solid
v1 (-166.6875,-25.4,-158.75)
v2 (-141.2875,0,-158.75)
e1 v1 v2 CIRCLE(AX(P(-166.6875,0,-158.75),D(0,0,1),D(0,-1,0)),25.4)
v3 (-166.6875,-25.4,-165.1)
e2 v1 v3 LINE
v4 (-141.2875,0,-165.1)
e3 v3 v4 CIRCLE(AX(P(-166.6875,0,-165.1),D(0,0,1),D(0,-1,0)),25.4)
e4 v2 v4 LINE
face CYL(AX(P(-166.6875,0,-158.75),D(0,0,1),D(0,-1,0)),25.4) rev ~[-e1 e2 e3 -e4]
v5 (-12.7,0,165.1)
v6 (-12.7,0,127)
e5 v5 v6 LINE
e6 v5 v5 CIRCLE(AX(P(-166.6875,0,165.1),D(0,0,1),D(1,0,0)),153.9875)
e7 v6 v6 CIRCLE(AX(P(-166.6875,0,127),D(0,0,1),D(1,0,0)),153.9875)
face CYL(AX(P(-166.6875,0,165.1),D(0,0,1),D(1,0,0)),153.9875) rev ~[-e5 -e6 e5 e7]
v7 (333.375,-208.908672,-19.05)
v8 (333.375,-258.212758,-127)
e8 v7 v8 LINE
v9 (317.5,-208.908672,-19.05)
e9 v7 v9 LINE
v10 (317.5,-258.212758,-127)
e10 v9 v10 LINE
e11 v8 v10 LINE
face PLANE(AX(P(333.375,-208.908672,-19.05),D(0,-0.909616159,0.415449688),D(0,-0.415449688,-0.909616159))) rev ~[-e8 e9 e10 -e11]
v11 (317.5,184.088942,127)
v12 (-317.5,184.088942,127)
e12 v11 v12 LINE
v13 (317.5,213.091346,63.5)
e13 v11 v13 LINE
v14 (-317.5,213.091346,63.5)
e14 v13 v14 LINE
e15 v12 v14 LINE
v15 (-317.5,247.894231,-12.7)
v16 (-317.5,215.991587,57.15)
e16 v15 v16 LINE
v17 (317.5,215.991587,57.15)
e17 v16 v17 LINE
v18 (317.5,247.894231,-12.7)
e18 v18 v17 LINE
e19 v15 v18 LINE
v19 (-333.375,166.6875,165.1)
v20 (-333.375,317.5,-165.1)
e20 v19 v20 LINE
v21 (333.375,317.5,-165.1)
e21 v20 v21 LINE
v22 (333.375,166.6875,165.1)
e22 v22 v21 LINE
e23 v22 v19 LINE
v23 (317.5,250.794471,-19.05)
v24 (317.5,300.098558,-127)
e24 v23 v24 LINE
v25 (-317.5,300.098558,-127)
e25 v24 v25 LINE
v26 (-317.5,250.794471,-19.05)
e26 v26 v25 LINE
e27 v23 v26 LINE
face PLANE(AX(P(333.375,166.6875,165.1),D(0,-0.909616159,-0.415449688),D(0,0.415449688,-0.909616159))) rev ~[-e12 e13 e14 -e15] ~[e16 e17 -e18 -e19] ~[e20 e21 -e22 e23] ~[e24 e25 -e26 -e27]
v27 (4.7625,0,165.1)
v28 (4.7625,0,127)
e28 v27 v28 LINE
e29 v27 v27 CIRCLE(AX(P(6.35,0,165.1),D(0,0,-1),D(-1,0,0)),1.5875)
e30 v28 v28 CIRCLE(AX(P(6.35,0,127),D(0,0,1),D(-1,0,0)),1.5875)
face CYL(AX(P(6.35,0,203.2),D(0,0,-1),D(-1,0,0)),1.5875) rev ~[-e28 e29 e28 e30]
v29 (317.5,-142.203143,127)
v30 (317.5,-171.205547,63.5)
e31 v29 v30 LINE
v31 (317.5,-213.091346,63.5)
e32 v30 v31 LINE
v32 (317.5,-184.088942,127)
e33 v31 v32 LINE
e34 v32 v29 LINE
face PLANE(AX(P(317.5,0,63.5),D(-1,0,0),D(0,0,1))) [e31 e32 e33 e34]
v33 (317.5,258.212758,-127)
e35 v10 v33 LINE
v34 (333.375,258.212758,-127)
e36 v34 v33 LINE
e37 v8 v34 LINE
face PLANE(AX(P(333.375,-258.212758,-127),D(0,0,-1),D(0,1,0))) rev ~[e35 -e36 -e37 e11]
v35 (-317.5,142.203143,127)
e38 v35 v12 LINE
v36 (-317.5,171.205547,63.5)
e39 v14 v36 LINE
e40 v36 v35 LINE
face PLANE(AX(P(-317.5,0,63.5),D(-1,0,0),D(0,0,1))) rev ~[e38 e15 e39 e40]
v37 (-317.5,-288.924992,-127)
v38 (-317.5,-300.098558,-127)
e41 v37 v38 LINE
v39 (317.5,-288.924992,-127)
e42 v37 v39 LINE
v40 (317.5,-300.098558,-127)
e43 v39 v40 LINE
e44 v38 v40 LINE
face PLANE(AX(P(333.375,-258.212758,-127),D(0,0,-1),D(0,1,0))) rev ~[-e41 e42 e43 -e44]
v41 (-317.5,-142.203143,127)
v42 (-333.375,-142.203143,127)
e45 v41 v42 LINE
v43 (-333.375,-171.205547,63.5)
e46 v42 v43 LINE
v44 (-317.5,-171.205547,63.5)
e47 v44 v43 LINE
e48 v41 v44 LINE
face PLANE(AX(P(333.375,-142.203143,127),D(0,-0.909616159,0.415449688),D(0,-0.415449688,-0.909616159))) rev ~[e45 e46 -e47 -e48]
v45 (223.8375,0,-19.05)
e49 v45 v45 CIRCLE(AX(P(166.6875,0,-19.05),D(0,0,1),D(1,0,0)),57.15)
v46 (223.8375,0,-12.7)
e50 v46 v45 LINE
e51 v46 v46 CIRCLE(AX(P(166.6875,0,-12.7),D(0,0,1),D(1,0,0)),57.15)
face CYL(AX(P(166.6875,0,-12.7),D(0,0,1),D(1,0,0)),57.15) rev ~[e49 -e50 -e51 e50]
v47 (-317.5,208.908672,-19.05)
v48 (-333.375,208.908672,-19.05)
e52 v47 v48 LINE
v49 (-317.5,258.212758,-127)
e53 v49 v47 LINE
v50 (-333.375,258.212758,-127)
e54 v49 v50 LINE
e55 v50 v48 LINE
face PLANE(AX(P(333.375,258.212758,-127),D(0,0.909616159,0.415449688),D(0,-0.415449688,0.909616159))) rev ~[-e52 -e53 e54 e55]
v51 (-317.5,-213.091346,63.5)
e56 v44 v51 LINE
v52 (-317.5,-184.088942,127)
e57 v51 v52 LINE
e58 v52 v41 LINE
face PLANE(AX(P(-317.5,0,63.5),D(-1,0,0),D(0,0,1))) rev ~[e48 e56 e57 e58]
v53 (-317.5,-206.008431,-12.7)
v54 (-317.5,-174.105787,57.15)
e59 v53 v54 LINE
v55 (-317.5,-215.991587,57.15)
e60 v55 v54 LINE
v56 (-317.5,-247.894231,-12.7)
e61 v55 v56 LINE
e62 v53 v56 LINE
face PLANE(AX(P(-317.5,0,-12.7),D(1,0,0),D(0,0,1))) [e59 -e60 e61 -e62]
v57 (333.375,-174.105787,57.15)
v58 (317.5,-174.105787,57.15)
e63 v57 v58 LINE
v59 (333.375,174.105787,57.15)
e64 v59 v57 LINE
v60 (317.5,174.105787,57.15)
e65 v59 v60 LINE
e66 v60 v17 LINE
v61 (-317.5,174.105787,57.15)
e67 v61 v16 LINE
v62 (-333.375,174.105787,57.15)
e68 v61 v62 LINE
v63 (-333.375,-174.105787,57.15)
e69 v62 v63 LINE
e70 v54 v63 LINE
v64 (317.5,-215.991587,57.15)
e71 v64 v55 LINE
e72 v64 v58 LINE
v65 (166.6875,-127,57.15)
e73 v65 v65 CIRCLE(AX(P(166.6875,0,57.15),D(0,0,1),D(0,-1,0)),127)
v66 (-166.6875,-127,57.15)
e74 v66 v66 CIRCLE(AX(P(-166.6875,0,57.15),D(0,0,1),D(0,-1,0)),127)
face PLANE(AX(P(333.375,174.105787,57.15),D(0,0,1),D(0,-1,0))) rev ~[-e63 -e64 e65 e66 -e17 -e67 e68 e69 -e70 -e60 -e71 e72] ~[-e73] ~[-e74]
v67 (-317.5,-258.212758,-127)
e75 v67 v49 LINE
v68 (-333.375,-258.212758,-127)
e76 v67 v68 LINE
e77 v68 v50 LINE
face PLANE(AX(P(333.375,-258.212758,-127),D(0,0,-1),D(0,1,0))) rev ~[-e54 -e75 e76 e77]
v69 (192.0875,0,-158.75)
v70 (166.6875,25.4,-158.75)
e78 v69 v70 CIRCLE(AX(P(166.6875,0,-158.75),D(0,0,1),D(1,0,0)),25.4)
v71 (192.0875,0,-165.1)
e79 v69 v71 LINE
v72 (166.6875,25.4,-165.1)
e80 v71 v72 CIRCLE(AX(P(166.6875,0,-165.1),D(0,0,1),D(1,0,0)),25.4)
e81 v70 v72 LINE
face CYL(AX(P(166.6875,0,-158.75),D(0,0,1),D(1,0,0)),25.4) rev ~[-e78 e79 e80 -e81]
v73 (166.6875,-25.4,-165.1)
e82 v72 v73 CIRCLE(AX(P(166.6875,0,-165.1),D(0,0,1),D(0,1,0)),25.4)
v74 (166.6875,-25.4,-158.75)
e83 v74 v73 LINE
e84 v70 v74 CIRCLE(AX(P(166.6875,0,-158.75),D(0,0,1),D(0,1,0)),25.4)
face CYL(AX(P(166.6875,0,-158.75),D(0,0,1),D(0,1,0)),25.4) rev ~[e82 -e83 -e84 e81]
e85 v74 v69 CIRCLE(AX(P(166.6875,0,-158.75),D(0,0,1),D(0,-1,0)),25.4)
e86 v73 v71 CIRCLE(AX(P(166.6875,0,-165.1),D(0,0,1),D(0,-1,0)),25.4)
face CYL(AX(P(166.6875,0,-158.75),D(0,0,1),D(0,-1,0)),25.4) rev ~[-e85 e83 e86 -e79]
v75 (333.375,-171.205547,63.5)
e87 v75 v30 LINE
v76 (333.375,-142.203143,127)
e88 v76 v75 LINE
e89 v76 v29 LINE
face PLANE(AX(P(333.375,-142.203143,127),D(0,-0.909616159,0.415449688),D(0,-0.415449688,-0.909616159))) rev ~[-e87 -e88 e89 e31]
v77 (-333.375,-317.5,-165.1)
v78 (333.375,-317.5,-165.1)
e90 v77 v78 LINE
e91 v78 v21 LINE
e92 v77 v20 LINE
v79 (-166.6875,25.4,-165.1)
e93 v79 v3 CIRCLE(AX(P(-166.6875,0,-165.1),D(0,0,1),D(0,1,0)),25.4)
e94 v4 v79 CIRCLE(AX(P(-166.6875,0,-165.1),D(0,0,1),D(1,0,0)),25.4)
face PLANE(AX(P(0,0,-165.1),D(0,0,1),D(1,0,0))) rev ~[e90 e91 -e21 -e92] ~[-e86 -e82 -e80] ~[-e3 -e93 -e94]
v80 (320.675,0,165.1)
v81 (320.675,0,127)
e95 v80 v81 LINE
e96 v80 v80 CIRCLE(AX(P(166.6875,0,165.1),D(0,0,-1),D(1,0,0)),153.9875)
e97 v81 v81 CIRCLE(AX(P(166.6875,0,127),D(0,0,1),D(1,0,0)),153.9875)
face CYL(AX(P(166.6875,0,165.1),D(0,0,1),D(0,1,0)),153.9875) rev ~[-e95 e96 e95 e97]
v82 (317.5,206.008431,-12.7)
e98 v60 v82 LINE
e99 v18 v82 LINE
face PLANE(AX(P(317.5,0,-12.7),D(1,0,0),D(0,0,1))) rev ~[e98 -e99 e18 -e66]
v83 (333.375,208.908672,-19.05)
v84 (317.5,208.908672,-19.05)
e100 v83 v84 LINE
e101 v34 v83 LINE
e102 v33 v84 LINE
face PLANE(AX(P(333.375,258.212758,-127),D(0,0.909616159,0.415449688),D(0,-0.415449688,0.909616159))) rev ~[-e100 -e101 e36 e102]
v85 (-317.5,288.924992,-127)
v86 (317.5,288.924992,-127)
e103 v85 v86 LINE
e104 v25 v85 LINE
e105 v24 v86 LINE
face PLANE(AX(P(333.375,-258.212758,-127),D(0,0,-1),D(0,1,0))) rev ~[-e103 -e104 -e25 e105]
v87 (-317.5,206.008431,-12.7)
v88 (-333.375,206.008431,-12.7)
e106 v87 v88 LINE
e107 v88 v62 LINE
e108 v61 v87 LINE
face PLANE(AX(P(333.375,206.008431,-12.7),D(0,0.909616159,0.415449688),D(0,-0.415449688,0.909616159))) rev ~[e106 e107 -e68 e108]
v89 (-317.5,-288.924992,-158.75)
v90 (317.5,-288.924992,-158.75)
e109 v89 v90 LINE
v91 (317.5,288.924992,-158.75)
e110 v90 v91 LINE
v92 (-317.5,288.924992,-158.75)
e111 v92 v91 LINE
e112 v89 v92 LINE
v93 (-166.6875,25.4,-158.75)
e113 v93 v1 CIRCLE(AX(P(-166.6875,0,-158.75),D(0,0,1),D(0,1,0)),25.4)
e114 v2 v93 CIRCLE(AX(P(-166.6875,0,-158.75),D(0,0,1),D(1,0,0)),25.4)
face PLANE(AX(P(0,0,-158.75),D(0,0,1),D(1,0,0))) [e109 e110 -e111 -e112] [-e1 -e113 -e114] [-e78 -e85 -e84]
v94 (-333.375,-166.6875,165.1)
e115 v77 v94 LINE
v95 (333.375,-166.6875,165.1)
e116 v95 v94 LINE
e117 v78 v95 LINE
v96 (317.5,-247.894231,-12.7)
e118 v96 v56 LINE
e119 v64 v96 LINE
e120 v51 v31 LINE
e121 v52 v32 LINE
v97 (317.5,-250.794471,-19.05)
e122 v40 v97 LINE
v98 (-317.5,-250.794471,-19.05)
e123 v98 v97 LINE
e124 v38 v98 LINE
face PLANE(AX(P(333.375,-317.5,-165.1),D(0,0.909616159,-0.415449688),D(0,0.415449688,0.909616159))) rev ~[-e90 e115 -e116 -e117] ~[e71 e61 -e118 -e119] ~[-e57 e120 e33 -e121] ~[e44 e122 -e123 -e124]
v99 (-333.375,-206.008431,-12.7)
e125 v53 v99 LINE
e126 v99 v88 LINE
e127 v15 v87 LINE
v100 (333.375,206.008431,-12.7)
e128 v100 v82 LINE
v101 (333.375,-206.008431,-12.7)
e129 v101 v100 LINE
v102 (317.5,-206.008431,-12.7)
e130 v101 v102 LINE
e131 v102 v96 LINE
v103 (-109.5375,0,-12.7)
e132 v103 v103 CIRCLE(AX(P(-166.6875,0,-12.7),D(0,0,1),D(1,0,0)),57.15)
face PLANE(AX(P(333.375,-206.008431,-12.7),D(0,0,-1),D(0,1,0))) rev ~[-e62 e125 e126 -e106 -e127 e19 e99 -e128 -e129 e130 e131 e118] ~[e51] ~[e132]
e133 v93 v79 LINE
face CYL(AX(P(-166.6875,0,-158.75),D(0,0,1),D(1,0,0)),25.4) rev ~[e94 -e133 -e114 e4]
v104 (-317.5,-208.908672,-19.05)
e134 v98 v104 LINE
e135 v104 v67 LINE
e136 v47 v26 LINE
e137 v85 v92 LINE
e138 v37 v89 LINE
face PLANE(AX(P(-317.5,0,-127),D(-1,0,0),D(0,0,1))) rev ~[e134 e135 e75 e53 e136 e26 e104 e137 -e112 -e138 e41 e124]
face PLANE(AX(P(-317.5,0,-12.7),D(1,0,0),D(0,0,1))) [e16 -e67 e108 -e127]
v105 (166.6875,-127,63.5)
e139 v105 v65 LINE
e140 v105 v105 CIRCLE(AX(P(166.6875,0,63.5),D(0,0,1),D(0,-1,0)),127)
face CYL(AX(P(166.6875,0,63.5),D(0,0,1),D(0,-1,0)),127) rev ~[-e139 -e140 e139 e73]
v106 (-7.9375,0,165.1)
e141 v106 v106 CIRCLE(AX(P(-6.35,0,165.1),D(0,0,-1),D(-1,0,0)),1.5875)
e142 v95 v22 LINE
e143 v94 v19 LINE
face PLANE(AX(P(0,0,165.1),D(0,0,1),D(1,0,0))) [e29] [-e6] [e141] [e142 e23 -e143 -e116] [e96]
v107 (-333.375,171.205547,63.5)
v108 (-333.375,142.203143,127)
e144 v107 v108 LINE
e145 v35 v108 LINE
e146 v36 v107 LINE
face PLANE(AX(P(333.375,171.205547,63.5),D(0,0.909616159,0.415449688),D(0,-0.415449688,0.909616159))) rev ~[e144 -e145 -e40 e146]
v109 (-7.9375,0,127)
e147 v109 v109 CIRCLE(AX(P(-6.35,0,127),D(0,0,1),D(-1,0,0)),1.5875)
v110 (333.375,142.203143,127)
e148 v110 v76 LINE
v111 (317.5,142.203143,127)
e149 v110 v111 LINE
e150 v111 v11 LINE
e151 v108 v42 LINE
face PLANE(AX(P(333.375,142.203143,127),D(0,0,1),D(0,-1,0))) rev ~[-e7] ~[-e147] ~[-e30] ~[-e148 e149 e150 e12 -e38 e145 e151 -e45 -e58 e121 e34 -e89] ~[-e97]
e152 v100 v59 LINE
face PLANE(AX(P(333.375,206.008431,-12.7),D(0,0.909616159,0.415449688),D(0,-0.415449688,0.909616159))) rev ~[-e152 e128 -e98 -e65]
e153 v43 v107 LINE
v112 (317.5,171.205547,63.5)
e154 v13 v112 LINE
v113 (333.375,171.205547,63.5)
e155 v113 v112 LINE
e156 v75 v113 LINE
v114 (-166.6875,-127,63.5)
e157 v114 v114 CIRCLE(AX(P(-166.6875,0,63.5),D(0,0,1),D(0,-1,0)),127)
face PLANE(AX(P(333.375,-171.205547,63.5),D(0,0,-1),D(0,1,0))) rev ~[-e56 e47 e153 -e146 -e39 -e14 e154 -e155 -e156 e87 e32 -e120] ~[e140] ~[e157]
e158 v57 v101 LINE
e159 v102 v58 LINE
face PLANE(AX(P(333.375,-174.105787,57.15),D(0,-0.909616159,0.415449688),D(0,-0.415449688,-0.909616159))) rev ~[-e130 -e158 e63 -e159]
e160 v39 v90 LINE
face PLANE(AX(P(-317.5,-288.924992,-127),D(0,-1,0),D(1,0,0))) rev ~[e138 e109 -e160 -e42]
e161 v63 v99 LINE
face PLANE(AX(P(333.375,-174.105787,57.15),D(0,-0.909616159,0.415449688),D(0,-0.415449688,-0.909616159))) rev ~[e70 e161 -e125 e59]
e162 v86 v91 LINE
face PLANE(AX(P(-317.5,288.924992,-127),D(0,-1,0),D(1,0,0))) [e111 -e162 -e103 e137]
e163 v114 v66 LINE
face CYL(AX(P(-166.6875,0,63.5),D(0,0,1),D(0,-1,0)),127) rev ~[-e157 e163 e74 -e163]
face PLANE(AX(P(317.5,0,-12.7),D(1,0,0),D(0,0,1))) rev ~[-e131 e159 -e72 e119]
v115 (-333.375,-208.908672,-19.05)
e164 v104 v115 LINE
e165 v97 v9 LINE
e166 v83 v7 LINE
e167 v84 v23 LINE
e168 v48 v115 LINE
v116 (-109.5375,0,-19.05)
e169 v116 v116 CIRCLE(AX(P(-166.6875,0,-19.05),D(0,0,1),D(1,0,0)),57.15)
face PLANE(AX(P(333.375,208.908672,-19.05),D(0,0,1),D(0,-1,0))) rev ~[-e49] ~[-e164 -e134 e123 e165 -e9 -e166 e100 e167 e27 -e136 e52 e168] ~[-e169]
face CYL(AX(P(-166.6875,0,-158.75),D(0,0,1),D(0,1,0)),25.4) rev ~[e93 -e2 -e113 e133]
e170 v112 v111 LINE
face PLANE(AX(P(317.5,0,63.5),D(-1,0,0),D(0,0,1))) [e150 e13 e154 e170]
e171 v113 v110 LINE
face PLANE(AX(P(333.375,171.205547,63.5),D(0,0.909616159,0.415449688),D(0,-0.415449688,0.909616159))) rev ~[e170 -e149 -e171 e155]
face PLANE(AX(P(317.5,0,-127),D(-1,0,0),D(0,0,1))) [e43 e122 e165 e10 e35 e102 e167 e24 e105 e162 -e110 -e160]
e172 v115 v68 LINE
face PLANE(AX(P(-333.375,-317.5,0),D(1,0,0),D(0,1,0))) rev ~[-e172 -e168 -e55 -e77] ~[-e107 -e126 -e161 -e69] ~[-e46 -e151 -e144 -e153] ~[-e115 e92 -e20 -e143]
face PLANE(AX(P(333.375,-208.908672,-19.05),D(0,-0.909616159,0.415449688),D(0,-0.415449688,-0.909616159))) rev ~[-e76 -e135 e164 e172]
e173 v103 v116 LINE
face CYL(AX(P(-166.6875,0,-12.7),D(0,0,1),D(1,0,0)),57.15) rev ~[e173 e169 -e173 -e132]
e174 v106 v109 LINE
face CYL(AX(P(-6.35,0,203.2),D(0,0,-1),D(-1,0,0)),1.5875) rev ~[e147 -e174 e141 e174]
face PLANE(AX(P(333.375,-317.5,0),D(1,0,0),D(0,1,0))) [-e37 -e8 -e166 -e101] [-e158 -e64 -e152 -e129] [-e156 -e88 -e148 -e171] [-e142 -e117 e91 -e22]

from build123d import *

# Parameters (mm, degrees)
F0_W      = 666.75
F0_H      = 635
F1_DEPTH  = 165.1
F4_W      = 333.375
F4_H      = 69.85
F5_DEPTH  = 666.751
F6_W      = 635
F6_H      = 63.5
F6_H_2    = 107.95
F6_H_3    = 69.85
F7_DEPTH  = 330.2
F9_DEPTH  = 38.1
F11_DEPTH = 25.4
F13_DEPTH = 25.4
F14_W     = 635
F14_H     = 577.849984169
F15_DEPTH = 31.75
F17_DEPTH = 25.4
F19_D     = 3.175
F19_DEPTH = 38.1
F19_TIP   = 0.9538662327


with BuildPart() as f1:
    # F0 (on Top) → F1 (new body, symmetric)
    with BuildSketch(Plane.XY):
        Rectangle(F0_W, F0_H)
    extrude(amount=F1_DEPTH, both=True)

    # F4 (on face) → F5 (cut, through all)
    with BuildSketch(Plane.YZ.offset(333.375)):
        Polygon((0, 127), (-142.2031428718, 127), (-166.6875, 73.3921443929), (-166.6875, 63.5), (166.6875, 63.5), (166.6875, 73.3921443929), (142.2031428718, 127), align=None)
        Polygon((-166.6875, 63.5), (-166.6875, 73.3921443929), (-171.2055467179, 63.5), align=None)
        Polygon((171.2055467179, 63.5), (166.6875, 73.3921443929), (166.6875, 63.5), align=None)
        Polygon((174.1057871025, 57.15), (166.6875, 57.15), (166.6875, -12.7), (206.0084313333, -12.7), align=None)
        with Locations((0, 22.225)):
            Rectangle(F4_W, F4_H)
        Polygon((-166.6875, -12.7), (-166.6875, 57.15), (-174.1057871025, 57.15), (-206.0084313333, -12.7), align=None)
        Polygon((-208.9086717179, -19.05), (-258.2127582564, -127), (-166.6875, -127), (-166.6875, -19.05), align=None)
        Polygon((-166.6875, -19.05), (-166.6875, -127), (0, -127), (166.6875, -127), (166.6875, -19.05), align=None)
        Polygon((166.6875, -19.05), (166.6875, -127), (258.2127582564, -127), (208.9086717179, -19.05), align=None)
        Polygon((317.5, 165.1), (166.6875, 165.1), (184.0889423077, 127), (213.0913461538, 63.5), (317.5, -165.1), align=None)
        Polygon((-184.0889423077, 127), (-166.6875, 165.1), (-317.5, 165.1), (-317.5, -165.1), (-213.0913461538, 63.5), align=None)
    extrude(amount=-F5_DEPTH, mode=Mode.SUBTRACT)

    # F6 (on Front) → F7 (cut, symmetric)
    with BuildSketch(Plane.XZ):
        with Locations((0, 95.25)):
            Rectangle(F6_W, F6_H)
        with Locations((0, -73.025)):
            Rectangle(F6_W, F6_H_2)
        with Locations((0, 22.225)):
            Rectangle(F6_W, F6_H_3)
    extrude(amount=F7_DEPTH, both=True, mode=Mode.SUBTRACT)

    # F3 (on face) + F8 (on face) → F9 (cut)
    with BuildSketch(Plane.XY.offset(165.1)):
        with BuildLine():
            ThreePointArc((-166.6875, 153.9875), (-320.675, 0), (-166.6875, -153.9875))
            Line((-166.6875, -153.9875), (-166.6875, 153.9875))
        make_face()
        with BuildLine():
            Line((-166.6875, 153.9875), (-166.6875, -153.9875))
            ThreePointArc((-166.6875, -153.9875), (-57.801894532, -108.885605468), (-12.7, 0))
            ThreePointArc((-12.7, 0), (-57.801894532, 108.885605468), (-166.6875, 153.9875))
        make_face()
        with BuildLine():
            ThreePointArc((166.6875, 153.9875), (12.7, 0), (166.6875, -153.9875))
            Line((166.6875, -153.9875), (166.6875, 153.9875))
        make_face()
    with BuildSketch(Plane.XY.offset(165.1)):
        with BuildLine():
            Line((166.6875, 153.9875), (166.6875, -153.9875))
            ThreePointArc((166.6875, -153.9875), (275.573105468, -108.885605468), (320.675, 0))
            ThreePointArc((320.675, 0), (275.573105468, 108.885605468), (166.6875, 153.9875))
        make_face()
    extrude(amount=-F9_DEPTH, mode=Mode.SUBTRACT)

    # F10 (on face) → F11 (cut)
    with BuildSketch(Plane.XY.offset(63.5)):
        with BuildLine():
            ThreePointArc((-166.6875, 127), (-293.6875, 0), (-166.6875, -127))
            Line((-166.6875, -127), (-166.6875, 127))
        make_face()
        with BuildLine():
            Line((-166.6875, 127), (-166.6875, -127))
            ThreePointArc((-166.6875, -127), (-76.8849387893, -89.8025612107), (-39.6875, 0))
            ThreePointArc((-39.6875, 0), (-76.8849387893, 89.8025612107), (-166.6875, 127))
        make_face()
        with BuildLine():
            ThreePointArc((166.6875, 127), (39.6875, 0), (166.6875, -127))
            Line((166.6875, -127), (166.6875, 127))
        make_face()
        with BuildLine():
            Line((166.6875, 127), (166.6875, -127))
            ThreePointArc((166.6875, -127), (256.4900612107, -89.8025612107), (293.6875, 0))
            ThreePointArc((293.6875, 0), (256.4900612107, 89.8025612107), (166.6875, 127))
        make_face()
    extrude(amount=-F11_DEPTH, mode=Mode.SUBTRACT)

    # F12 (on face) → F13 (cut)
    with BuildSketch(Plane.XY.offset(-12.7)):
        with BuildLine():
            ThreePointArc((-166.6875, 57.15), (-223.8375, 0), (-166.6875, -57.15))
            Line((-166.6875, -57.15), (-166.6875, 57.15))
        make_face()
        with BuildLine():
            Line((-166.6875, 57.15), (-166.6875, -57.15))
            ThreePointArc((-166.6875, -57.15), (-126.2763474552, -40.4111525448), (-109.5375, 0))
            ThreePointArc((-109.5375, 0), (-126.2763474552, 40.4111525448), (-166.6875, 57.15))
        make_face()
        with BuildLine():
            ThreePointArc((166.6875, 57.15), (109.5375, 0), (166.6875, -57.15))
            Line((166.6875, -57.15), (166.6875, 57.15))
        make_face()
        with BuildLine():
            Line((166.6875, 57.15), (166.6875, -57.15))
            ThreePointArc((166.6875, -57.15), (207.0986525448, -40.4111525448), (223.8375, 0))
            ThreePointArc((223.8375, 0), (207.0986525448, 40.4111525448), (166.6875, 57.15))
        make_face()
    extrude(amount=-F13_DEPTH, mode=Mode.SUBTRACT)

    # F14 (on face) → F15 (cut)
    with BuildSketch(Plane.XY.offset(-127)):
        Rectangle(F14_W, F14_H)
    extrude(amount=-F15_DEPTH, mode=Mode.SUBTRACT)

    # F16 (on face) → F17 (cut)
    with BuildSketch(Plane.XY.offset(-158.75)):
        with BuildLine():
            ThreePointArc((-166.6875, 25.4), (-192.0875, 0), (-166.6875, -25.4))
            Line((-166.6875, -25.4), (-166.6875, 25.4))
        make_face()
        with BuildLine():
            Line((-166.6875, 25.4), (-166.6875, -25.4))
            ThreePointArc((-166.6875, -25.4), (-148.7269877579, -17.9605122421), (-141.2875, 0))
            ThreePointArc((-141.2875, 0), (-148.7269877579, 17.9605122421), (-166.6875, 25.4))
        make_face()
        with BuildLine():
            Line((166.6875, 25.4), (166.6875, -25.4))
            ThreePointArc((166.6875, -25.4), (184.6480122421, -17.9605122421), (192.0875, 0))
            ThreePointArc((192.0875, 0), (184.6480122421, 17.9605122421), (166.6875, 25.4))
        make_face()
        with BuildLine():
            ThreePointArc((166.6875, 25.4), (141.2875, 0), (166.6875, -25.4))
            Line((166.6875, -25.4), (166.6875, 25.4))
        make_face()
    extrude(amount=-F17_DEPTH, mode=Mode.SUBTRACT)

    # F19
    with Locations(Plane.XY.offset(165.1)):
        with Locations((-6.35, 0), (6.35, 0)):
            Hole(F19_D / 2, depth=F19_DEPTH)
            with Locations((0, 0, -(F19_DEPTH + F19_TIP / 2))):  # 118° drill point
                Cone(0, F19_D / 2, F19_TIP, mode=Mode.SUBTRACT)


solid = f1.part
